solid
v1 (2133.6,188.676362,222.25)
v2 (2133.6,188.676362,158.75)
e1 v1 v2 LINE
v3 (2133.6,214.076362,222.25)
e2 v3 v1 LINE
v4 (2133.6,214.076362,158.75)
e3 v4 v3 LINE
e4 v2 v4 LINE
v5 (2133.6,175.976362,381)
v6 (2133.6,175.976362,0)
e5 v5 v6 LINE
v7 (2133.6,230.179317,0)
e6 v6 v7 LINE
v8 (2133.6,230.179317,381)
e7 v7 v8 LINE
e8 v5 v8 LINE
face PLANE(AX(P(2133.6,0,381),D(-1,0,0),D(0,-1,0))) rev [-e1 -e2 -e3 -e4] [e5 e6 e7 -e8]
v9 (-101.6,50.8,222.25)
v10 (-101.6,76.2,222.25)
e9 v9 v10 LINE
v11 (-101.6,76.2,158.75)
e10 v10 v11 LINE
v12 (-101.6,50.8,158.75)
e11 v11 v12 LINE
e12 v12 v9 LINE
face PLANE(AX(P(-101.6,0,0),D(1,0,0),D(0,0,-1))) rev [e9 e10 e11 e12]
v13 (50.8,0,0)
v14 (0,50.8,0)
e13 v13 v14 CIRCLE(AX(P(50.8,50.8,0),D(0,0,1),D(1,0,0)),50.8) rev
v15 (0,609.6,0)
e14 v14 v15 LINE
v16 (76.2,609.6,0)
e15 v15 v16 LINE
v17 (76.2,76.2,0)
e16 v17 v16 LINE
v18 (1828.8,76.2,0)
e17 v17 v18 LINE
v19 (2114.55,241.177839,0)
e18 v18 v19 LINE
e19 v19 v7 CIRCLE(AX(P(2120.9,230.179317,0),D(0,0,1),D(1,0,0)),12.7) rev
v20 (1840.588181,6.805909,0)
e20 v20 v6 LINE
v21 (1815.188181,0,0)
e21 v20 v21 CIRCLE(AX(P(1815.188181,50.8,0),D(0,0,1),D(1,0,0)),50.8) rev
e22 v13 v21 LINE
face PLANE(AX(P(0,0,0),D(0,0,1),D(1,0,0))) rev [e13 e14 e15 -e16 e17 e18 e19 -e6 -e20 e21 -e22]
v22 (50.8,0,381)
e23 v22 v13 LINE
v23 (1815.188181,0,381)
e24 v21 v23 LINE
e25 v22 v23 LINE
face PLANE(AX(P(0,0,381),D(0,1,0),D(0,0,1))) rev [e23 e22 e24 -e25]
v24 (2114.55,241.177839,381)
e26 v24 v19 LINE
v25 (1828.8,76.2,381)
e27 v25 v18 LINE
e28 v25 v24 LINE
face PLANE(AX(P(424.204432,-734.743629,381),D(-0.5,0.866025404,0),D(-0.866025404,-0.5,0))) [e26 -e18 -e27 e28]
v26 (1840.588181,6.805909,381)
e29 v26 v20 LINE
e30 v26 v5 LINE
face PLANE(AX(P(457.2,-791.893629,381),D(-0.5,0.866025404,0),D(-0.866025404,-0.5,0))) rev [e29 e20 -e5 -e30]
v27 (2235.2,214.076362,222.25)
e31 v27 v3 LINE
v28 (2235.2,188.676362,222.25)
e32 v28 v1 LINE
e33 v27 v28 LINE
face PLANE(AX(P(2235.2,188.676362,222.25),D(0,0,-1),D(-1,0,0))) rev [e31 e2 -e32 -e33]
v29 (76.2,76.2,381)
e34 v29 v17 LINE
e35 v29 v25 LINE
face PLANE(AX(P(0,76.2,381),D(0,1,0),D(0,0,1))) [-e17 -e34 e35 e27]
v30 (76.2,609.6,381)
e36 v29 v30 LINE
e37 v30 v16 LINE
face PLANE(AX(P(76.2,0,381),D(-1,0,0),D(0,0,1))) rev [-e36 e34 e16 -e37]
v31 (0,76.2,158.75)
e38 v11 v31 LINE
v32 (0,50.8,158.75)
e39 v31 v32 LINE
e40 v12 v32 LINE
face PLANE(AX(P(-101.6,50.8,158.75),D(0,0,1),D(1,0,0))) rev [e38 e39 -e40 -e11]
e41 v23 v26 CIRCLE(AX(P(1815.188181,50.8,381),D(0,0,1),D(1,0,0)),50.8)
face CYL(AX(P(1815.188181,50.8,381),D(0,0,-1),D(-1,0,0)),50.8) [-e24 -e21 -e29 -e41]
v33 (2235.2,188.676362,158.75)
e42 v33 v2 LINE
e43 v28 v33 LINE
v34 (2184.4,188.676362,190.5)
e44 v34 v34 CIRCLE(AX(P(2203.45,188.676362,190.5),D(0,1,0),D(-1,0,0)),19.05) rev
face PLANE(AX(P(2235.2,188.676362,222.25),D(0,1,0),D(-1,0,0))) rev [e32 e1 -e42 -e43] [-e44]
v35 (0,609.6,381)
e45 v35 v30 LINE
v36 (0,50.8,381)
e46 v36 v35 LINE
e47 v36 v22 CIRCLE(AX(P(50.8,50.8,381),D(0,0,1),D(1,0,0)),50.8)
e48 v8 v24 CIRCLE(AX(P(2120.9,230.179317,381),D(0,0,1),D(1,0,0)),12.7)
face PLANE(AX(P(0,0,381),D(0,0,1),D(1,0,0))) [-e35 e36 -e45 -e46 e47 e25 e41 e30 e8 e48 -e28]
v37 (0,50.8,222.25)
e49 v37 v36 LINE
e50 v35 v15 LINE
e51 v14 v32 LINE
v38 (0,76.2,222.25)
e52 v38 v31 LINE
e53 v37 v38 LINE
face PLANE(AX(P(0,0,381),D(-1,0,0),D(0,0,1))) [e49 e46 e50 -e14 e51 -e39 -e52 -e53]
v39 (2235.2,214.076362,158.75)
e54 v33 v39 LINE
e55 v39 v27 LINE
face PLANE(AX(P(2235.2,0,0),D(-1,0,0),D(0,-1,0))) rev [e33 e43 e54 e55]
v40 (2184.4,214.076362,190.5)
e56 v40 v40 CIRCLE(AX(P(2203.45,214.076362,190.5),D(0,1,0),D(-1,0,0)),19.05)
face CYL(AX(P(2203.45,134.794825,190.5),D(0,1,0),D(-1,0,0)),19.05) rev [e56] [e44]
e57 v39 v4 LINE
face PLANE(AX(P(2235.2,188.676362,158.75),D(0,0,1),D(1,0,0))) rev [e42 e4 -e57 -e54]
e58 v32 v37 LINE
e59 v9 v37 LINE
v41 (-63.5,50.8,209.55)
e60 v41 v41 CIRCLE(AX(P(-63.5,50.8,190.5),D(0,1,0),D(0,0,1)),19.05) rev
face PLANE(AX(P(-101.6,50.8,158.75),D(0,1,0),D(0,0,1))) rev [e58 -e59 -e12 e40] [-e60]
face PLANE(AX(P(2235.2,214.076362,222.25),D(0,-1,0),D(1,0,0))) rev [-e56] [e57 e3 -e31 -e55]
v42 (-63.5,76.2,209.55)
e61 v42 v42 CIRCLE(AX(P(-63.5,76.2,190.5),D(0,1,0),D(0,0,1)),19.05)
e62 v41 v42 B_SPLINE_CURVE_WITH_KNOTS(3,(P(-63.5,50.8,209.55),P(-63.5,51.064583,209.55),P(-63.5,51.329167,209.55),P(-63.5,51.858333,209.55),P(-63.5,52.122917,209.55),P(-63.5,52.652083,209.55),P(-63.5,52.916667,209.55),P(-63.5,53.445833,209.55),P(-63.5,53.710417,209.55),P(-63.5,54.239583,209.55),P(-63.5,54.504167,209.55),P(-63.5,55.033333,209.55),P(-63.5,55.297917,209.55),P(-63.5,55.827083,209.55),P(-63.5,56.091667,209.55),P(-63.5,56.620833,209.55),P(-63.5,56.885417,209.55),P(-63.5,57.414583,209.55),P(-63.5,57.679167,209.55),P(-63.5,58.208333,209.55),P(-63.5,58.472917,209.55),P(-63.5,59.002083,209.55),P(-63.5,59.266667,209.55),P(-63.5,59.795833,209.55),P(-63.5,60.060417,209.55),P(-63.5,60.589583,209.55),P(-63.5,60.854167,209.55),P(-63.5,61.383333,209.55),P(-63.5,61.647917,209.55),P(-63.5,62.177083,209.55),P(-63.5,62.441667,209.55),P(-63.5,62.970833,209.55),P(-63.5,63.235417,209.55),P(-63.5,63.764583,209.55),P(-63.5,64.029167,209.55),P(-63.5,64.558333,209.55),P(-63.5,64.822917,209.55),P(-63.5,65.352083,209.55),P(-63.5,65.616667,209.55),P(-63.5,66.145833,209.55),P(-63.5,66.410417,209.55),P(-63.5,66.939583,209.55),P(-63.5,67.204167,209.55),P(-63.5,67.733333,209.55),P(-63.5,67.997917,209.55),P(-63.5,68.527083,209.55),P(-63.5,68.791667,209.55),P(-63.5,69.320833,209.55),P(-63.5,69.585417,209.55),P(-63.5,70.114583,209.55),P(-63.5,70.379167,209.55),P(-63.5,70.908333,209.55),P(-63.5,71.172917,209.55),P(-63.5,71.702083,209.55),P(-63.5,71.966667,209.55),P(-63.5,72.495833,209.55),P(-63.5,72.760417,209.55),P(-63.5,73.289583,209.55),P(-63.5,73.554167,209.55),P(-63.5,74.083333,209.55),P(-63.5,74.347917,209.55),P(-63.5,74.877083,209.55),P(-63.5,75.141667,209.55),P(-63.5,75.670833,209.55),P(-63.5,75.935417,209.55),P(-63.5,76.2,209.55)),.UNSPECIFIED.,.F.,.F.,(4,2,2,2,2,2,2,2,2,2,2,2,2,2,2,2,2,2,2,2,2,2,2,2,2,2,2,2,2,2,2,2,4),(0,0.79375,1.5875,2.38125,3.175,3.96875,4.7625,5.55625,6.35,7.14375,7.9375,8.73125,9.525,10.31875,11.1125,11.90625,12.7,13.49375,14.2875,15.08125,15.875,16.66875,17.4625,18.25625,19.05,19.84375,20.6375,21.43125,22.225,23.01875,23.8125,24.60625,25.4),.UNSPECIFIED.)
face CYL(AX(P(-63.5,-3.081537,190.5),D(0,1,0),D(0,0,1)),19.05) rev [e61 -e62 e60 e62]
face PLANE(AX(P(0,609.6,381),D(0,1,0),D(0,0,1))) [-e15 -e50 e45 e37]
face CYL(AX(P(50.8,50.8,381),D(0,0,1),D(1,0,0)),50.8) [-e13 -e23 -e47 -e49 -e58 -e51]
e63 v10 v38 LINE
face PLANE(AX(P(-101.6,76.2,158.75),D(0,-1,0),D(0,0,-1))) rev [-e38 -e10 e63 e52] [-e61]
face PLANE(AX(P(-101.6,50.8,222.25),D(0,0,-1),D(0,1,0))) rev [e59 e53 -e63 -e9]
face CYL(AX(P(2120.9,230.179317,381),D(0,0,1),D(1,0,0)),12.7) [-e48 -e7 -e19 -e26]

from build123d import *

# Parameters (mm, degrees)
BOSS_EXTRUDE1_DEPTH = 381
SKETCH5_W           = 63.5
SKETCH5_H           = 25.4
BOSS_EXTRUDE4_DEPTH = 101.6
SKETCH6_R           = 19.05
CUT_EXTRUDE3_DEPTH  = 25.4
FILLET3_R           = 50.8
FILLET4_R           = 12.7
FILLET5_R           = 50.8
SKETCH7_W           = 63.5
SKETCH7_H           = 25.4
BOSS_EXTRUDE5_DEPTH = 101.6
SKETCH8_R           = 19.05
CUT_EXTRUDE4_DEPTH  = 25.4


with BuildPart() as part:
    # Sketch1 → Boss-Extrude1 (new body)
    with BuildSketch(Plane.XY):
        Polygon((0, 7.775510204), (0, 0), (6.220408163, 0), (1828.8, 0), (2133.6, 175.976362049), (2133.6, 252.176362049), (1828.8, 76.2), (76.2, 76.2), (76.2, 609.6), (0, 609.6), align=None)
    extrude(amount=BOSS_EXTRUDE1_DEPTH)

    # Sketch5 → Boss-Extrude4 (add)
    with BuildSketch(Plane.ZY):
        with Locations((190.5, 63.5)):
            Rectangle(SKETCH5_W, SKETCH5_H)
    extrude(amount=BOSS_EXTRUDE4_DEPTH)

    # Sketch6 → Cut-Extrude3 (cut)
    with BuildSketch(Plane(origin=(0, 76.2, 0), x_dir=(1, 0, 0), z_dir=(0, 1, 0))):
        with Locations(Location((-63.5, -190.5, 0), (0, 0, 270))):
            Circle(SKETCH6_R)
    extrude(amount=-CUT_EXTRUDE3_DEPTH, mode=Mode.SUBTRACT)

    # Fillet3
    fillet3_edges = [part.edges().sort_by_distance(p)[0] for p in [
        (1828.8, 0, 190.5),
    ]]
    fillet(fillet3_edges, radius=FILLET3_R)

    # Fillet4
    fillet4_edges = [part.edges().sort_by_distance(p)[0] for p in [
        (2133.6, 252.176362049, 190.5),
    ]]
    fillet(fillet4_edges, radius=FILLET4_R)

    # Fillet5
    fillet5_edges = [part.edges().sort_by_distance(p)[0] for p in [
        (0, 0, 190.5),
    ]]
    fillet(fillet5_edges, radius=FILLET5_R - 0.0001)  # a hair under: the kernel refuses the full size

    # Sketch7 → Boss-Extrude5 (add)
    with BuildSketch(Plane(origin=(2133.6, 0, 0), x_dir=(0, 0, -1), z_dir=(1, 0, 0))):
        with Locations((-190.5, 201.376362049)):
            Rectangle(SKETCH7_W, SKETCH7_H)
    extrude(amount=BOSS_EXTRUDE5_DEPTH)

    # Sketch8 → Cut-Extrude4 (cut)
    with BuildSketch(Plane(origin=(0, 214.076362049, 0), x_dir=(1, 0, 0), z_dir=(0, 1, 0))):
        with Locations(Location((2203.45, -190.5, 0), (0, 0, 180))):
            Circle(SKETCH8_R)
    extrude(amount=-CUT_EXTRUDE4_DEPTH, mode=Mode.SUBTRACT)


solid = part.part
